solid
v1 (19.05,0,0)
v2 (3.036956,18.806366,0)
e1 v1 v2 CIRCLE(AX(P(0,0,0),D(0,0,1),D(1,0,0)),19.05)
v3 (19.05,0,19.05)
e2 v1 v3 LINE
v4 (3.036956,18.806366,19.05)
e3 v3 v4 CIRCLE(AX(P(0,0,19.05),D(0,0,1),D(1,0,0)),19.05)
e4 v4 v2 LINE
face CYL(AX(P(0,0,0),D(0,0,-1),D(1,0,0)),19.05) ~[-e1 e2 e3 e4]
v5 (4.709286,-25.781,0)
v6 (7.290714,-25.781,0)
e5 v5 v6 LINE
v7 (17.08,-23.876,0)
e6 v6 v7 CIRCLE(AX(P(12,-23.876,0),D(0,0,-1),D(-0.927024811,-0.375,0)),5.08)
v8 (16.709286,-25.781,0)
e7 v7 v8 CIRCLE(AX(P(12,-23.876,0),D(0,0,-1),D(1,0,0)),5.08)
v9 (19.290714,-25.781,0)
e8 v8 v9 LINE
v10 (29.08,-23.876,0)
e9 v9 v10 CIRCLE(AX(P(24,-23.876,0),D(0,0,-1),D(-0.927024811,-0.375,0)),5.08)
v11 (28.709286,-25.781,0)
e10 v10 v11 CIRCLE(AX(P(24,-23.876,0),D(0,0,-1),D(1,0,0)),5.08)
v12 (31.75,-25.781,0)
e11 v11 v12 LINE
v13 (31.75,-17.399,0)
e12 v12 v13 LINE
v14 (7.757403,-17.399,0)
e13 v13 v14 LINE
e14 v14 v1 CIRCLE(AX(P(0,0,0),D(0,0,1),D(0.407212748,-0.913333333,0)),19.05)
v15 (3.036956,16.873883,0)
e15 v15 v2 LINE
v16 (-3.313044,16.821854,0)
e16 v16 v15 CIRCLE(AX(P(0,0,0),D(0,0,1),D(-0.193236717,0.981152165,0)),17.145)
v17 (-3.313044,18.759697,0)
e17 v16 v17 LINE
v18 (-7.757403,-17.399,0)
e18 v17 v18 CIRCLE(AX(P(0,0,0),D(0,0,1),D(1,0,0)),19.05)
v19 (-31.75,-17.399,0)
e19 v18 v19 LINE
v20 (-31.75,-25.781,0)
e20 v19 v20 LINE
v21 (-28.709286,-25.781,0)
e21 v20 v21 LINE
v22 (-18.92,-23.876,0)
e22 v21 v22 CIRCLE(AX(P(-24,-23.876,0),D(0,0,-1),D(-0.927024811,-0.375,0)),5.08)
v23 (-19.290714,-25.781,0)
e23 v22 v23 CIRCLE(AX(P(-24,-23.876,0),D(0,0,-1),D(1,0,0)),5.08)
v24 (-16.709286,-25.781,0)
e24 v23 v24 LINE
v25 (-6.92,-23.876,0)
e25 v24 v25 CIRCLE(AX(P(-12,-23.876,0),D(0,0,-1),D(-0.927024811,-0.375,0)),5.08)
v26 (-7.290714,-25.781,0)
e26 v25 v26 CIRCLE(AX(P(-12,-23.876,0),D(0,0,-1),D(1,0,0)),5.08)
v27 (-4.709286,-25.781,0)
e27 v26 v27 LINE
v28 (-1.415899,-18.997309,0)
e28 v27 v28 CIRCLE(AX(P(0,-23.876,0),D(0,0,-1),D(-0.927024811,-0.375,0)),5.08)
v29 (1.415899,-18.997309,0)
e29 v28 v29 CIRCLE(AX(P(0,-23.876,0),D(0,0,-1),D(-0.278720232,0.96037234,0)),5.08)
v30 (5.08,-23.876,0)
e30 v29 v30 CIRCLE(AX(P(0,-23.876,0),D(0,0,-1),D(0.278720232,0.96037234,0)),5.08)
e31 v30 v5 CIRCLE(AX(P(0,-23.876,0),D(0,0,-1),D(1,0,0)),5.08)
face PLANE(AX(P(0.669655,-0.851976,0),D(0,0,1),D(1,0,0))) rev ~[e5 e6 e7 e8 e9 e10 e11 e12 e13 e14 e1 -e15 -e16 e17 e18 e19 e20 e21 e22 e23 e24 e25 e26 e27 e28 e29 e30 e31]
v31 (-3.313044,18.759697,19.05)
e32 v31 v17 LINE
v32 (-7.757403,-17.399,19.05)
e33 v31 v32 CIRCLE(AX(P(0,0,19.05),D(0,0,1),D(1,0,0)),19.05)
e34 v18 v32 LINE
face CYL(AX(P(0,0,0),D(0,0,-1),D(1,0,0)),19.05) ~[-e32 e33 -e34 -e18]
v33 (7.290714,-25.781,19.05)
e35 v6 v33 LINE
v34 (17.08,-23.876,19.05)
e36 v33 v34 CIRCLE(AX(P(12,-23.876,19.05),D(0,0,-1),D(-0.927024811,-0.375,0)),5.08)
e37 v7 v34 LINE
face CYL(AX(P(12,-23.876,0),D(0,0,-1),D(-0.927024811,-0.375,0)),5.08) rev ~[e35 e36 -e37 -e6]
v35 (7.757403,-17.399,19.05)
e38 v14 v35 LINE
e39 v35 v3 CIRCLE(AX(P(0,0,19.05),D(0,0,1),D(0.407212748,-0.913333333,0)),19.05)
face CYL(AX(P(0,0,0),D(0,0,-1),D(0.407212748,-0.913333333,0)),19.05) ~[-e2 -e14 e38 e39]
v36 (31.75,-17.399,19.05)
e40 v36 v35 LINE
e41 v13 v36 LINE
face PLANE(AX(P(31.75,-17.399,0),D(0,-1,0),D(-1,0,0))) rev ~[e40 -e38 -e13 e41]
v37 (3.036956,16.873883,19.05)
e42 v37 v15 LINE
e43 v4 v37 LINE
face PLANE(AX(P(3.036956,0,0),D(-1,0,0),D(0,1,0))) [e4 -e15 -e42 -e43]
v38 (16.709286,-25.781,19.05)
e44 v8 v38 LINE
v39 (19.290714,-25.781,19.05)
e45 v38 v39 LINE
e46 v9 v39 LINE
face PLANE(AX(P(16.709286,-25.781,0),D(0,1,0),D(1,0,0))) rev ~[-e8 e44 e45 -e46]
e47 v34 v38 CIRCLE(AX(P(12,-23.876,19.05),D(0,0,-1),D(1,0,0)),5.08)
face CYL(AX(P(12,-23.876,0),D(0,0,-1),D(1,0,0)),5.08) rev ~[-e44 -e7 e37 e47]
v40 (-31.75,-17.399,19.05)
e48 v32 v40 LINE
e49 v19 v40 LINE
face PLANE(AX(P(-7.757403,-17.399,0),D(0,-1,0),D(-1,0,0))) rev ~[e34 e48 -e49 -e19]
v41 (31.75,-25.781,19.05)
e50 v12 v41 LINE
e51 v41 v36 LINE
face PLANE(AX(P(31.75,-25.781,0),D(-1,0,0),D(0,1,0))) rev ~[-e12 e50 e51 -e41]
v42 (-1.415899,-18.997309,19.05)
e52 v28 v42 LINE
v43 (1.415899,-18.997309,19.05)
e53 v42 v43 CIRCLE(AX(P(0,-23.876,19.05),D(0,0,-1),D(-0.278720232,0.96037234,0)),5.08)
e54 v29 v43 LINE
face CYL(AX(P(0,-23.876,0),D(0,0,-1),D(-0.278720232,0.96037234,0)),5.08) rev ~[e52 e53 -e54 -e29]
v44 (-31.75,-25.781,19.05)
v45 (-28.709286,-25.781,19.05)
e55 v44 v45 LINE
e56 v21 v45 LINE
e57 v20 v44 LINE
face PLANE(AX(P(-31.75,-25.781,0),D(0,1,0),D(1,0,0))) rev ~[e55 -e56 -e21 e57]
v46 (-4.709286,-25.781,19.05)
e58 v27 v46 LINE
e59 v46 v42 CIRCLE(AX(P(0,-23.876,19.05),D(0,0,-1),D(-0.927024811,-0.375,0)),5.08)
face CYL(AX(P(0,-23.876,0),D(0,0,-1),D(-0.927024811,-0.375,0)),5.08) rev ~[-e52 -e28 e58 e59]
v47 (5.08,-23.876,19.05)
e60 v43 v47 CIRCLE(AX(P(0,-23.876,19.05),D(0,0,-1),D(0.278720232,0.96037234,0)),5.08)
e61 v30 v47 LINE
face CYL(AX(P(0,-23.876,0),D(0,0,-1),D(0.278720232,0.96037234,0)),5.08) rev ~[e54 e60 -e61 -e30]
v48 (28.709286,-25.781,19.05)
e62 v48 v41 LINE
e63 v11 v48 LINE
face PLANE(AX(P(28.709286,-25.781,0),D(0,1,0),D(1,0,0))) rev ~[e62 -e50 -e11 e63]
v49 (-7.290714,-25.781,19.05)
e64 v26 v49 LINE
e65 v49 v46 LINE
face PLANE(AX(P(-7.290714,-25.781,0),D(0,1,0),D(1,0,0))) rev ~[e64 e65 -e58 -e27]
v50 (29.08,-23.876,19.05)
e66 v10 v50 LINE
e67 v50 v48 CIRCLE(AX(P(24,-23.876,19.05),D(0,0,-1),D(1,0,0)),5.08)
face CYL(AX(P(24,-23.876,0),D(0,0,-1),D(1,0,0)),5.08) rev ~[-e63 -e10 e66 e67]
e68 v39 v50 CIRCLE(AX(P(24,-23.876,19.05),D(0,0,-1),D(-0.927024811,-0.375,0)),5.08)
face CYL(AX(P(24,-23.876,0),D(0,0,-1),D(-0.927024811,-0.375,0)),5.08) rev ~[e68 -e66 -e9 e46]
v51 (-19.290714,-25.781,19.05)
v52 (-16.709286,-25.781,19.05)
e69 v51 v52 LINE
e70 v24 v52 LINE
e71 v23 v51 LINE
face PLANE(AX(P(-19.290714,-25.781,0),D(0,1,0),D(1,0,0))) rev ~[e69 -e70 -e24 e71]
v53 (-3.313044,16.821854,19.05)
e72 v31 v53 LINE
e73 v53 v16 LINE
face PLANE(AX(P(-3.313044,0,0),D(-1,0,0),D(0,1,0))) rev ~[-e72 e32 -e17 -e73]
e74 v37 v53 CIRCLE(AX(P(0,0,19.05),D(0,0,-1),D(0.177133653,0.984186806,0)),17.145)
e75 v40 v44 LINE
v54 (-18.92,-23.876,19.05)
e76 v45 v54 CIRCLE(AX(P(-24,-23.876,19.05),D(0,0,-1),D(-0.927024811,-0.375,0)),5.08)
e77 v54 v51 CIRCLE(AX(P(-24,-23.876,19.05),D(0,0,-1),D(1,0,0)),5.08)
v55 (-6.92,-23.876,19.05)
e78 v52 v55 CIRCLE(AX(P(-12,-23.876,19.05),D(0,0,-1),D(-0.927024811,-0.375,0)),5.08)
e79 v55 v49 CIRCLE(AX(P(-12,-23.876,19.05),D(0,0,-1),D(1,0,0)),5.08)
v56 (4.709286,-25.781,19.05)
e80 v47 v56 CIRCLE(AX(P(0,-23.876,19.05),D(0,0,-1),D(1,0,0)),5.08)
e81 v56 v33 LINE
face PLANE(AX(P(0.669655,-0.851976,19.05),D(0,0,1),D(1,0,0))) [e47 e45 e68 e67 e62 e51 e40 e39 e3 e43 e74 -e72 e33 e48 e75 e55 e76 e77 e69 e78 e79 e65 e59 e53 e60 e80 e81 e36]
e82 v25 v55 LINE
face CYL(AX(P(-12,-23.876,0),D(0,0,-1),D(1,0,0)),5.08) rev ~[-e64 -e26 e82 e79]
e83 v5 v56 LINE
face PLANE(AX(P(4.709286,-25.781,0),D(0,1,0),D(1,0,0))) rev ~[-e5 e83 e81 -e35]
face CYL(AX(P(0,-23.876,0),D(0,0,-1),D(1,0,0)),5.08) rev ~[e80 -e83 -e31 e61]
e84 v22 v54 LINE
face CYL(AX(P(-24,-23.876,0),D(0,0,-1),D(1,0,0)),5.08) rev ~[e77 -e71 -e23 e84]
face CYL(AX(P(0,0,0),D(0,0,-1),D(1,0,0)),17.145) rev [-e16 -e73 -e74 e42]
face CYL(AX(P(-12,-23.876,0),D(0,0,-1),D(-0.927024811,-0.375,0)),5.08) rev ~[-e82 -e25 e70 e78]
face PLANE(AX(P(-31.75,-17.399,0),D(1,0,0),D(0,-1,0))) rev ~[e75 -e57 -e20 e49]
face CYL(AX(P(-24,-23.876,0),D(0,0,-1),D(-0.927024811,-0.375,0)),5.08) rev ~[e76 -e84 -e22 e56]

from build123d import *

# Parameters (mm, degrees)
F0_R     = 17.145
F1_DEPTH = 19.05
F2_DEPTH = 25.4
F3_W     = 6.35
F3_H     = 30.0934736039
F4_DEPTH = 25.4


# Not quite as in the source:
# - a feature names something its author has since deleted; it is built from what else it names


with BuildPart() as f1:
    # F0 (on Top) → F1 (new body)
    with BuildSketch(Plane.XY):
        with BuildLine():
            ThreePointArc((7.7574028515, -17.399), (15.9793777151, -10.3712095649), (19.05, 0))
            ThreePointArc((19.05, 0), (-10.3712095649, 15.9793777151), (-7.7574028515, -17.399))
            Line((-7.7574028515, -17.399), (7.7574028515, -17.399))
        make_face()
        Circle(F0_R, mode=Mode.SUBTRACT)
        with BuildLine():
            Line((7.7574028515, -17.399), (-7.7574028515, -17.399))
            ThreePointArc((-7.7574028515, -17.399), (-4.6557505543, -18.472316768), (-1.4158987787, -18.9973085106))
            ThreePointArc((-1.4158987787, -18.9973085106), (0, -18.796), (1.4158987787, -18.9973085106))
            ThreePointArc((1.4158987787, -18.9973085106), (4.6557505543, -18.472316768), (7.7574028515, -17.399))
        make_face()
        with BuildLine():
            Line((31.75, -17.399), (7.7574028515, -17.399))
            ThreePointArc((7.7574028515, -17.399), (4.6557505543, -18.472316768), (1.4158987787, -18.9973085106))
            ThreePointArc((1.4158987787, -18.9973085106), (4.0619678603, -20.8252923605), (5.08, -23.876))
            ThreePointArc((5.08, -23.876), (4.9864603217, -24.8463676933), (4.7092860393, -25.781))
            Line((4.7092860393, -25.781), (7.2907139607, -25.781))
            ThreePointArc((7.2907139607, -25.781), (11.0296323067, -18.8895396783), (17.08, -23.876))
            ThreePointArc((17.08, -23.876), (16.9864603217, -24.8463676933), (16.7092860393, -25.781))
            Line((16.7092860393, -25.781), (19.2907139607, -25.781))
            ThreePointArc((19.2907139607, -25.781), (23.0296323067, -18.8895396783), (29.08, -23.876))
            ThreePointArc((29.08, -23.876), (28.9864603217, -24.8463676933), (28.7092860393, -25.781))
            Line((28.7092860393, -25.781), (31.75, -25.781))
            Line((31.75, -25.781), (31.75, -17.399))
        make_face()
        with BuildLine():
            ThreePointArc((-1.4158987787, -18.9973085106), (-4.6557505543, -18.472316768), (-7.7574028515, -17.399))
            Line((-7.7574028515, -17.399), (-31.75, -17.399))
            Line((-31.75, -17.399), (-31.75, -25.781))
            Line((-31.75, -25.781), (-28.7092860393, -25.781))
            ThreePointArc((-28.7092860393, -25.781), (-24.9703676933, -18.8895396783), (-18.92, -23.876))
            ThreePointArc((-18.92, -23.876), (-19.0135396783, -24.8463676933), (-19.2907139607, -25.781))
            Line((-19.2907139607, -25.781), (-16.7092860393, -25.781))
            ThreePointArc((-16.7092860393, -25.781), (-12.9703676933, -18.8895396783), (-6.92, -23.876))
            ThreePointArc((-6.92, -23.876), (-7.0135396783, -24.8463676933), (-7.2907139607, -25.781))
            Line((-7.2907139607, -25.781), (-4.7092860393, -25.781))
            ThreePointArc((-4.7092860393, -25.781), (-4.5699113579, -21.6573720049), (-1.4158987787, -18.9973085106))
        make_face()
    extrude(amount=F1_DEPTH)

    # F0 (on Top) → F2 (cut)
    with BuildSketch(Plane.XY):
        with BuildLine():
            Line((-16.7092860393, -25.781), (-7.2907139607, -25.781))
            ThreePointArc((-7.2907139607, -25.781), (-7.0135396783, -24.8463676933), (-6.92, -23.876))
            ThreePointArc((-6.92, -23.876), (-12.9703676933, -18.8895396783), (-16.7092860393, -25.781))
        make_face()
        with BuildLine():
            ThreePointArc((-18.92, -23.876), (-24.9703676933, -18.8895396783), (-28.7092860393, -25.781))
            Line((-28.7092860393, -25.781), (-19.2907139607, -25.781))
            ThreePointArc((-19.2907139607, -25.781), (-19.0135396783, -24.8463676933), (-18.92, -23.876))
        make_face()
        with BuildLine():
            ThreePointArc((17.08, -23.876), (11.0296323067, -18.8895396783), (7.2907139607, -25.781))
            Line((7.2907139607, -25.781), (16.7092860393, -25.781))
            ThreePointArc((16.7092860393, -25.781), (16.9864603217, -24.8463676933), (17.08, -23.876))
        make_face()
    extrude(amount=F2_DEPTH, mode=Mode.SUBTRACT)

    # F3 (on Top) → F4 (cut)
    with BuildSketch(Plane.XY):
        with Locations((-0.1380435133, 15.0467368019)):
            Rectangle(F3_W, F3_H)
    extrude(amount=F4_DEPTH, mode=Mode.SUBTRACT)


solid = f1.part
